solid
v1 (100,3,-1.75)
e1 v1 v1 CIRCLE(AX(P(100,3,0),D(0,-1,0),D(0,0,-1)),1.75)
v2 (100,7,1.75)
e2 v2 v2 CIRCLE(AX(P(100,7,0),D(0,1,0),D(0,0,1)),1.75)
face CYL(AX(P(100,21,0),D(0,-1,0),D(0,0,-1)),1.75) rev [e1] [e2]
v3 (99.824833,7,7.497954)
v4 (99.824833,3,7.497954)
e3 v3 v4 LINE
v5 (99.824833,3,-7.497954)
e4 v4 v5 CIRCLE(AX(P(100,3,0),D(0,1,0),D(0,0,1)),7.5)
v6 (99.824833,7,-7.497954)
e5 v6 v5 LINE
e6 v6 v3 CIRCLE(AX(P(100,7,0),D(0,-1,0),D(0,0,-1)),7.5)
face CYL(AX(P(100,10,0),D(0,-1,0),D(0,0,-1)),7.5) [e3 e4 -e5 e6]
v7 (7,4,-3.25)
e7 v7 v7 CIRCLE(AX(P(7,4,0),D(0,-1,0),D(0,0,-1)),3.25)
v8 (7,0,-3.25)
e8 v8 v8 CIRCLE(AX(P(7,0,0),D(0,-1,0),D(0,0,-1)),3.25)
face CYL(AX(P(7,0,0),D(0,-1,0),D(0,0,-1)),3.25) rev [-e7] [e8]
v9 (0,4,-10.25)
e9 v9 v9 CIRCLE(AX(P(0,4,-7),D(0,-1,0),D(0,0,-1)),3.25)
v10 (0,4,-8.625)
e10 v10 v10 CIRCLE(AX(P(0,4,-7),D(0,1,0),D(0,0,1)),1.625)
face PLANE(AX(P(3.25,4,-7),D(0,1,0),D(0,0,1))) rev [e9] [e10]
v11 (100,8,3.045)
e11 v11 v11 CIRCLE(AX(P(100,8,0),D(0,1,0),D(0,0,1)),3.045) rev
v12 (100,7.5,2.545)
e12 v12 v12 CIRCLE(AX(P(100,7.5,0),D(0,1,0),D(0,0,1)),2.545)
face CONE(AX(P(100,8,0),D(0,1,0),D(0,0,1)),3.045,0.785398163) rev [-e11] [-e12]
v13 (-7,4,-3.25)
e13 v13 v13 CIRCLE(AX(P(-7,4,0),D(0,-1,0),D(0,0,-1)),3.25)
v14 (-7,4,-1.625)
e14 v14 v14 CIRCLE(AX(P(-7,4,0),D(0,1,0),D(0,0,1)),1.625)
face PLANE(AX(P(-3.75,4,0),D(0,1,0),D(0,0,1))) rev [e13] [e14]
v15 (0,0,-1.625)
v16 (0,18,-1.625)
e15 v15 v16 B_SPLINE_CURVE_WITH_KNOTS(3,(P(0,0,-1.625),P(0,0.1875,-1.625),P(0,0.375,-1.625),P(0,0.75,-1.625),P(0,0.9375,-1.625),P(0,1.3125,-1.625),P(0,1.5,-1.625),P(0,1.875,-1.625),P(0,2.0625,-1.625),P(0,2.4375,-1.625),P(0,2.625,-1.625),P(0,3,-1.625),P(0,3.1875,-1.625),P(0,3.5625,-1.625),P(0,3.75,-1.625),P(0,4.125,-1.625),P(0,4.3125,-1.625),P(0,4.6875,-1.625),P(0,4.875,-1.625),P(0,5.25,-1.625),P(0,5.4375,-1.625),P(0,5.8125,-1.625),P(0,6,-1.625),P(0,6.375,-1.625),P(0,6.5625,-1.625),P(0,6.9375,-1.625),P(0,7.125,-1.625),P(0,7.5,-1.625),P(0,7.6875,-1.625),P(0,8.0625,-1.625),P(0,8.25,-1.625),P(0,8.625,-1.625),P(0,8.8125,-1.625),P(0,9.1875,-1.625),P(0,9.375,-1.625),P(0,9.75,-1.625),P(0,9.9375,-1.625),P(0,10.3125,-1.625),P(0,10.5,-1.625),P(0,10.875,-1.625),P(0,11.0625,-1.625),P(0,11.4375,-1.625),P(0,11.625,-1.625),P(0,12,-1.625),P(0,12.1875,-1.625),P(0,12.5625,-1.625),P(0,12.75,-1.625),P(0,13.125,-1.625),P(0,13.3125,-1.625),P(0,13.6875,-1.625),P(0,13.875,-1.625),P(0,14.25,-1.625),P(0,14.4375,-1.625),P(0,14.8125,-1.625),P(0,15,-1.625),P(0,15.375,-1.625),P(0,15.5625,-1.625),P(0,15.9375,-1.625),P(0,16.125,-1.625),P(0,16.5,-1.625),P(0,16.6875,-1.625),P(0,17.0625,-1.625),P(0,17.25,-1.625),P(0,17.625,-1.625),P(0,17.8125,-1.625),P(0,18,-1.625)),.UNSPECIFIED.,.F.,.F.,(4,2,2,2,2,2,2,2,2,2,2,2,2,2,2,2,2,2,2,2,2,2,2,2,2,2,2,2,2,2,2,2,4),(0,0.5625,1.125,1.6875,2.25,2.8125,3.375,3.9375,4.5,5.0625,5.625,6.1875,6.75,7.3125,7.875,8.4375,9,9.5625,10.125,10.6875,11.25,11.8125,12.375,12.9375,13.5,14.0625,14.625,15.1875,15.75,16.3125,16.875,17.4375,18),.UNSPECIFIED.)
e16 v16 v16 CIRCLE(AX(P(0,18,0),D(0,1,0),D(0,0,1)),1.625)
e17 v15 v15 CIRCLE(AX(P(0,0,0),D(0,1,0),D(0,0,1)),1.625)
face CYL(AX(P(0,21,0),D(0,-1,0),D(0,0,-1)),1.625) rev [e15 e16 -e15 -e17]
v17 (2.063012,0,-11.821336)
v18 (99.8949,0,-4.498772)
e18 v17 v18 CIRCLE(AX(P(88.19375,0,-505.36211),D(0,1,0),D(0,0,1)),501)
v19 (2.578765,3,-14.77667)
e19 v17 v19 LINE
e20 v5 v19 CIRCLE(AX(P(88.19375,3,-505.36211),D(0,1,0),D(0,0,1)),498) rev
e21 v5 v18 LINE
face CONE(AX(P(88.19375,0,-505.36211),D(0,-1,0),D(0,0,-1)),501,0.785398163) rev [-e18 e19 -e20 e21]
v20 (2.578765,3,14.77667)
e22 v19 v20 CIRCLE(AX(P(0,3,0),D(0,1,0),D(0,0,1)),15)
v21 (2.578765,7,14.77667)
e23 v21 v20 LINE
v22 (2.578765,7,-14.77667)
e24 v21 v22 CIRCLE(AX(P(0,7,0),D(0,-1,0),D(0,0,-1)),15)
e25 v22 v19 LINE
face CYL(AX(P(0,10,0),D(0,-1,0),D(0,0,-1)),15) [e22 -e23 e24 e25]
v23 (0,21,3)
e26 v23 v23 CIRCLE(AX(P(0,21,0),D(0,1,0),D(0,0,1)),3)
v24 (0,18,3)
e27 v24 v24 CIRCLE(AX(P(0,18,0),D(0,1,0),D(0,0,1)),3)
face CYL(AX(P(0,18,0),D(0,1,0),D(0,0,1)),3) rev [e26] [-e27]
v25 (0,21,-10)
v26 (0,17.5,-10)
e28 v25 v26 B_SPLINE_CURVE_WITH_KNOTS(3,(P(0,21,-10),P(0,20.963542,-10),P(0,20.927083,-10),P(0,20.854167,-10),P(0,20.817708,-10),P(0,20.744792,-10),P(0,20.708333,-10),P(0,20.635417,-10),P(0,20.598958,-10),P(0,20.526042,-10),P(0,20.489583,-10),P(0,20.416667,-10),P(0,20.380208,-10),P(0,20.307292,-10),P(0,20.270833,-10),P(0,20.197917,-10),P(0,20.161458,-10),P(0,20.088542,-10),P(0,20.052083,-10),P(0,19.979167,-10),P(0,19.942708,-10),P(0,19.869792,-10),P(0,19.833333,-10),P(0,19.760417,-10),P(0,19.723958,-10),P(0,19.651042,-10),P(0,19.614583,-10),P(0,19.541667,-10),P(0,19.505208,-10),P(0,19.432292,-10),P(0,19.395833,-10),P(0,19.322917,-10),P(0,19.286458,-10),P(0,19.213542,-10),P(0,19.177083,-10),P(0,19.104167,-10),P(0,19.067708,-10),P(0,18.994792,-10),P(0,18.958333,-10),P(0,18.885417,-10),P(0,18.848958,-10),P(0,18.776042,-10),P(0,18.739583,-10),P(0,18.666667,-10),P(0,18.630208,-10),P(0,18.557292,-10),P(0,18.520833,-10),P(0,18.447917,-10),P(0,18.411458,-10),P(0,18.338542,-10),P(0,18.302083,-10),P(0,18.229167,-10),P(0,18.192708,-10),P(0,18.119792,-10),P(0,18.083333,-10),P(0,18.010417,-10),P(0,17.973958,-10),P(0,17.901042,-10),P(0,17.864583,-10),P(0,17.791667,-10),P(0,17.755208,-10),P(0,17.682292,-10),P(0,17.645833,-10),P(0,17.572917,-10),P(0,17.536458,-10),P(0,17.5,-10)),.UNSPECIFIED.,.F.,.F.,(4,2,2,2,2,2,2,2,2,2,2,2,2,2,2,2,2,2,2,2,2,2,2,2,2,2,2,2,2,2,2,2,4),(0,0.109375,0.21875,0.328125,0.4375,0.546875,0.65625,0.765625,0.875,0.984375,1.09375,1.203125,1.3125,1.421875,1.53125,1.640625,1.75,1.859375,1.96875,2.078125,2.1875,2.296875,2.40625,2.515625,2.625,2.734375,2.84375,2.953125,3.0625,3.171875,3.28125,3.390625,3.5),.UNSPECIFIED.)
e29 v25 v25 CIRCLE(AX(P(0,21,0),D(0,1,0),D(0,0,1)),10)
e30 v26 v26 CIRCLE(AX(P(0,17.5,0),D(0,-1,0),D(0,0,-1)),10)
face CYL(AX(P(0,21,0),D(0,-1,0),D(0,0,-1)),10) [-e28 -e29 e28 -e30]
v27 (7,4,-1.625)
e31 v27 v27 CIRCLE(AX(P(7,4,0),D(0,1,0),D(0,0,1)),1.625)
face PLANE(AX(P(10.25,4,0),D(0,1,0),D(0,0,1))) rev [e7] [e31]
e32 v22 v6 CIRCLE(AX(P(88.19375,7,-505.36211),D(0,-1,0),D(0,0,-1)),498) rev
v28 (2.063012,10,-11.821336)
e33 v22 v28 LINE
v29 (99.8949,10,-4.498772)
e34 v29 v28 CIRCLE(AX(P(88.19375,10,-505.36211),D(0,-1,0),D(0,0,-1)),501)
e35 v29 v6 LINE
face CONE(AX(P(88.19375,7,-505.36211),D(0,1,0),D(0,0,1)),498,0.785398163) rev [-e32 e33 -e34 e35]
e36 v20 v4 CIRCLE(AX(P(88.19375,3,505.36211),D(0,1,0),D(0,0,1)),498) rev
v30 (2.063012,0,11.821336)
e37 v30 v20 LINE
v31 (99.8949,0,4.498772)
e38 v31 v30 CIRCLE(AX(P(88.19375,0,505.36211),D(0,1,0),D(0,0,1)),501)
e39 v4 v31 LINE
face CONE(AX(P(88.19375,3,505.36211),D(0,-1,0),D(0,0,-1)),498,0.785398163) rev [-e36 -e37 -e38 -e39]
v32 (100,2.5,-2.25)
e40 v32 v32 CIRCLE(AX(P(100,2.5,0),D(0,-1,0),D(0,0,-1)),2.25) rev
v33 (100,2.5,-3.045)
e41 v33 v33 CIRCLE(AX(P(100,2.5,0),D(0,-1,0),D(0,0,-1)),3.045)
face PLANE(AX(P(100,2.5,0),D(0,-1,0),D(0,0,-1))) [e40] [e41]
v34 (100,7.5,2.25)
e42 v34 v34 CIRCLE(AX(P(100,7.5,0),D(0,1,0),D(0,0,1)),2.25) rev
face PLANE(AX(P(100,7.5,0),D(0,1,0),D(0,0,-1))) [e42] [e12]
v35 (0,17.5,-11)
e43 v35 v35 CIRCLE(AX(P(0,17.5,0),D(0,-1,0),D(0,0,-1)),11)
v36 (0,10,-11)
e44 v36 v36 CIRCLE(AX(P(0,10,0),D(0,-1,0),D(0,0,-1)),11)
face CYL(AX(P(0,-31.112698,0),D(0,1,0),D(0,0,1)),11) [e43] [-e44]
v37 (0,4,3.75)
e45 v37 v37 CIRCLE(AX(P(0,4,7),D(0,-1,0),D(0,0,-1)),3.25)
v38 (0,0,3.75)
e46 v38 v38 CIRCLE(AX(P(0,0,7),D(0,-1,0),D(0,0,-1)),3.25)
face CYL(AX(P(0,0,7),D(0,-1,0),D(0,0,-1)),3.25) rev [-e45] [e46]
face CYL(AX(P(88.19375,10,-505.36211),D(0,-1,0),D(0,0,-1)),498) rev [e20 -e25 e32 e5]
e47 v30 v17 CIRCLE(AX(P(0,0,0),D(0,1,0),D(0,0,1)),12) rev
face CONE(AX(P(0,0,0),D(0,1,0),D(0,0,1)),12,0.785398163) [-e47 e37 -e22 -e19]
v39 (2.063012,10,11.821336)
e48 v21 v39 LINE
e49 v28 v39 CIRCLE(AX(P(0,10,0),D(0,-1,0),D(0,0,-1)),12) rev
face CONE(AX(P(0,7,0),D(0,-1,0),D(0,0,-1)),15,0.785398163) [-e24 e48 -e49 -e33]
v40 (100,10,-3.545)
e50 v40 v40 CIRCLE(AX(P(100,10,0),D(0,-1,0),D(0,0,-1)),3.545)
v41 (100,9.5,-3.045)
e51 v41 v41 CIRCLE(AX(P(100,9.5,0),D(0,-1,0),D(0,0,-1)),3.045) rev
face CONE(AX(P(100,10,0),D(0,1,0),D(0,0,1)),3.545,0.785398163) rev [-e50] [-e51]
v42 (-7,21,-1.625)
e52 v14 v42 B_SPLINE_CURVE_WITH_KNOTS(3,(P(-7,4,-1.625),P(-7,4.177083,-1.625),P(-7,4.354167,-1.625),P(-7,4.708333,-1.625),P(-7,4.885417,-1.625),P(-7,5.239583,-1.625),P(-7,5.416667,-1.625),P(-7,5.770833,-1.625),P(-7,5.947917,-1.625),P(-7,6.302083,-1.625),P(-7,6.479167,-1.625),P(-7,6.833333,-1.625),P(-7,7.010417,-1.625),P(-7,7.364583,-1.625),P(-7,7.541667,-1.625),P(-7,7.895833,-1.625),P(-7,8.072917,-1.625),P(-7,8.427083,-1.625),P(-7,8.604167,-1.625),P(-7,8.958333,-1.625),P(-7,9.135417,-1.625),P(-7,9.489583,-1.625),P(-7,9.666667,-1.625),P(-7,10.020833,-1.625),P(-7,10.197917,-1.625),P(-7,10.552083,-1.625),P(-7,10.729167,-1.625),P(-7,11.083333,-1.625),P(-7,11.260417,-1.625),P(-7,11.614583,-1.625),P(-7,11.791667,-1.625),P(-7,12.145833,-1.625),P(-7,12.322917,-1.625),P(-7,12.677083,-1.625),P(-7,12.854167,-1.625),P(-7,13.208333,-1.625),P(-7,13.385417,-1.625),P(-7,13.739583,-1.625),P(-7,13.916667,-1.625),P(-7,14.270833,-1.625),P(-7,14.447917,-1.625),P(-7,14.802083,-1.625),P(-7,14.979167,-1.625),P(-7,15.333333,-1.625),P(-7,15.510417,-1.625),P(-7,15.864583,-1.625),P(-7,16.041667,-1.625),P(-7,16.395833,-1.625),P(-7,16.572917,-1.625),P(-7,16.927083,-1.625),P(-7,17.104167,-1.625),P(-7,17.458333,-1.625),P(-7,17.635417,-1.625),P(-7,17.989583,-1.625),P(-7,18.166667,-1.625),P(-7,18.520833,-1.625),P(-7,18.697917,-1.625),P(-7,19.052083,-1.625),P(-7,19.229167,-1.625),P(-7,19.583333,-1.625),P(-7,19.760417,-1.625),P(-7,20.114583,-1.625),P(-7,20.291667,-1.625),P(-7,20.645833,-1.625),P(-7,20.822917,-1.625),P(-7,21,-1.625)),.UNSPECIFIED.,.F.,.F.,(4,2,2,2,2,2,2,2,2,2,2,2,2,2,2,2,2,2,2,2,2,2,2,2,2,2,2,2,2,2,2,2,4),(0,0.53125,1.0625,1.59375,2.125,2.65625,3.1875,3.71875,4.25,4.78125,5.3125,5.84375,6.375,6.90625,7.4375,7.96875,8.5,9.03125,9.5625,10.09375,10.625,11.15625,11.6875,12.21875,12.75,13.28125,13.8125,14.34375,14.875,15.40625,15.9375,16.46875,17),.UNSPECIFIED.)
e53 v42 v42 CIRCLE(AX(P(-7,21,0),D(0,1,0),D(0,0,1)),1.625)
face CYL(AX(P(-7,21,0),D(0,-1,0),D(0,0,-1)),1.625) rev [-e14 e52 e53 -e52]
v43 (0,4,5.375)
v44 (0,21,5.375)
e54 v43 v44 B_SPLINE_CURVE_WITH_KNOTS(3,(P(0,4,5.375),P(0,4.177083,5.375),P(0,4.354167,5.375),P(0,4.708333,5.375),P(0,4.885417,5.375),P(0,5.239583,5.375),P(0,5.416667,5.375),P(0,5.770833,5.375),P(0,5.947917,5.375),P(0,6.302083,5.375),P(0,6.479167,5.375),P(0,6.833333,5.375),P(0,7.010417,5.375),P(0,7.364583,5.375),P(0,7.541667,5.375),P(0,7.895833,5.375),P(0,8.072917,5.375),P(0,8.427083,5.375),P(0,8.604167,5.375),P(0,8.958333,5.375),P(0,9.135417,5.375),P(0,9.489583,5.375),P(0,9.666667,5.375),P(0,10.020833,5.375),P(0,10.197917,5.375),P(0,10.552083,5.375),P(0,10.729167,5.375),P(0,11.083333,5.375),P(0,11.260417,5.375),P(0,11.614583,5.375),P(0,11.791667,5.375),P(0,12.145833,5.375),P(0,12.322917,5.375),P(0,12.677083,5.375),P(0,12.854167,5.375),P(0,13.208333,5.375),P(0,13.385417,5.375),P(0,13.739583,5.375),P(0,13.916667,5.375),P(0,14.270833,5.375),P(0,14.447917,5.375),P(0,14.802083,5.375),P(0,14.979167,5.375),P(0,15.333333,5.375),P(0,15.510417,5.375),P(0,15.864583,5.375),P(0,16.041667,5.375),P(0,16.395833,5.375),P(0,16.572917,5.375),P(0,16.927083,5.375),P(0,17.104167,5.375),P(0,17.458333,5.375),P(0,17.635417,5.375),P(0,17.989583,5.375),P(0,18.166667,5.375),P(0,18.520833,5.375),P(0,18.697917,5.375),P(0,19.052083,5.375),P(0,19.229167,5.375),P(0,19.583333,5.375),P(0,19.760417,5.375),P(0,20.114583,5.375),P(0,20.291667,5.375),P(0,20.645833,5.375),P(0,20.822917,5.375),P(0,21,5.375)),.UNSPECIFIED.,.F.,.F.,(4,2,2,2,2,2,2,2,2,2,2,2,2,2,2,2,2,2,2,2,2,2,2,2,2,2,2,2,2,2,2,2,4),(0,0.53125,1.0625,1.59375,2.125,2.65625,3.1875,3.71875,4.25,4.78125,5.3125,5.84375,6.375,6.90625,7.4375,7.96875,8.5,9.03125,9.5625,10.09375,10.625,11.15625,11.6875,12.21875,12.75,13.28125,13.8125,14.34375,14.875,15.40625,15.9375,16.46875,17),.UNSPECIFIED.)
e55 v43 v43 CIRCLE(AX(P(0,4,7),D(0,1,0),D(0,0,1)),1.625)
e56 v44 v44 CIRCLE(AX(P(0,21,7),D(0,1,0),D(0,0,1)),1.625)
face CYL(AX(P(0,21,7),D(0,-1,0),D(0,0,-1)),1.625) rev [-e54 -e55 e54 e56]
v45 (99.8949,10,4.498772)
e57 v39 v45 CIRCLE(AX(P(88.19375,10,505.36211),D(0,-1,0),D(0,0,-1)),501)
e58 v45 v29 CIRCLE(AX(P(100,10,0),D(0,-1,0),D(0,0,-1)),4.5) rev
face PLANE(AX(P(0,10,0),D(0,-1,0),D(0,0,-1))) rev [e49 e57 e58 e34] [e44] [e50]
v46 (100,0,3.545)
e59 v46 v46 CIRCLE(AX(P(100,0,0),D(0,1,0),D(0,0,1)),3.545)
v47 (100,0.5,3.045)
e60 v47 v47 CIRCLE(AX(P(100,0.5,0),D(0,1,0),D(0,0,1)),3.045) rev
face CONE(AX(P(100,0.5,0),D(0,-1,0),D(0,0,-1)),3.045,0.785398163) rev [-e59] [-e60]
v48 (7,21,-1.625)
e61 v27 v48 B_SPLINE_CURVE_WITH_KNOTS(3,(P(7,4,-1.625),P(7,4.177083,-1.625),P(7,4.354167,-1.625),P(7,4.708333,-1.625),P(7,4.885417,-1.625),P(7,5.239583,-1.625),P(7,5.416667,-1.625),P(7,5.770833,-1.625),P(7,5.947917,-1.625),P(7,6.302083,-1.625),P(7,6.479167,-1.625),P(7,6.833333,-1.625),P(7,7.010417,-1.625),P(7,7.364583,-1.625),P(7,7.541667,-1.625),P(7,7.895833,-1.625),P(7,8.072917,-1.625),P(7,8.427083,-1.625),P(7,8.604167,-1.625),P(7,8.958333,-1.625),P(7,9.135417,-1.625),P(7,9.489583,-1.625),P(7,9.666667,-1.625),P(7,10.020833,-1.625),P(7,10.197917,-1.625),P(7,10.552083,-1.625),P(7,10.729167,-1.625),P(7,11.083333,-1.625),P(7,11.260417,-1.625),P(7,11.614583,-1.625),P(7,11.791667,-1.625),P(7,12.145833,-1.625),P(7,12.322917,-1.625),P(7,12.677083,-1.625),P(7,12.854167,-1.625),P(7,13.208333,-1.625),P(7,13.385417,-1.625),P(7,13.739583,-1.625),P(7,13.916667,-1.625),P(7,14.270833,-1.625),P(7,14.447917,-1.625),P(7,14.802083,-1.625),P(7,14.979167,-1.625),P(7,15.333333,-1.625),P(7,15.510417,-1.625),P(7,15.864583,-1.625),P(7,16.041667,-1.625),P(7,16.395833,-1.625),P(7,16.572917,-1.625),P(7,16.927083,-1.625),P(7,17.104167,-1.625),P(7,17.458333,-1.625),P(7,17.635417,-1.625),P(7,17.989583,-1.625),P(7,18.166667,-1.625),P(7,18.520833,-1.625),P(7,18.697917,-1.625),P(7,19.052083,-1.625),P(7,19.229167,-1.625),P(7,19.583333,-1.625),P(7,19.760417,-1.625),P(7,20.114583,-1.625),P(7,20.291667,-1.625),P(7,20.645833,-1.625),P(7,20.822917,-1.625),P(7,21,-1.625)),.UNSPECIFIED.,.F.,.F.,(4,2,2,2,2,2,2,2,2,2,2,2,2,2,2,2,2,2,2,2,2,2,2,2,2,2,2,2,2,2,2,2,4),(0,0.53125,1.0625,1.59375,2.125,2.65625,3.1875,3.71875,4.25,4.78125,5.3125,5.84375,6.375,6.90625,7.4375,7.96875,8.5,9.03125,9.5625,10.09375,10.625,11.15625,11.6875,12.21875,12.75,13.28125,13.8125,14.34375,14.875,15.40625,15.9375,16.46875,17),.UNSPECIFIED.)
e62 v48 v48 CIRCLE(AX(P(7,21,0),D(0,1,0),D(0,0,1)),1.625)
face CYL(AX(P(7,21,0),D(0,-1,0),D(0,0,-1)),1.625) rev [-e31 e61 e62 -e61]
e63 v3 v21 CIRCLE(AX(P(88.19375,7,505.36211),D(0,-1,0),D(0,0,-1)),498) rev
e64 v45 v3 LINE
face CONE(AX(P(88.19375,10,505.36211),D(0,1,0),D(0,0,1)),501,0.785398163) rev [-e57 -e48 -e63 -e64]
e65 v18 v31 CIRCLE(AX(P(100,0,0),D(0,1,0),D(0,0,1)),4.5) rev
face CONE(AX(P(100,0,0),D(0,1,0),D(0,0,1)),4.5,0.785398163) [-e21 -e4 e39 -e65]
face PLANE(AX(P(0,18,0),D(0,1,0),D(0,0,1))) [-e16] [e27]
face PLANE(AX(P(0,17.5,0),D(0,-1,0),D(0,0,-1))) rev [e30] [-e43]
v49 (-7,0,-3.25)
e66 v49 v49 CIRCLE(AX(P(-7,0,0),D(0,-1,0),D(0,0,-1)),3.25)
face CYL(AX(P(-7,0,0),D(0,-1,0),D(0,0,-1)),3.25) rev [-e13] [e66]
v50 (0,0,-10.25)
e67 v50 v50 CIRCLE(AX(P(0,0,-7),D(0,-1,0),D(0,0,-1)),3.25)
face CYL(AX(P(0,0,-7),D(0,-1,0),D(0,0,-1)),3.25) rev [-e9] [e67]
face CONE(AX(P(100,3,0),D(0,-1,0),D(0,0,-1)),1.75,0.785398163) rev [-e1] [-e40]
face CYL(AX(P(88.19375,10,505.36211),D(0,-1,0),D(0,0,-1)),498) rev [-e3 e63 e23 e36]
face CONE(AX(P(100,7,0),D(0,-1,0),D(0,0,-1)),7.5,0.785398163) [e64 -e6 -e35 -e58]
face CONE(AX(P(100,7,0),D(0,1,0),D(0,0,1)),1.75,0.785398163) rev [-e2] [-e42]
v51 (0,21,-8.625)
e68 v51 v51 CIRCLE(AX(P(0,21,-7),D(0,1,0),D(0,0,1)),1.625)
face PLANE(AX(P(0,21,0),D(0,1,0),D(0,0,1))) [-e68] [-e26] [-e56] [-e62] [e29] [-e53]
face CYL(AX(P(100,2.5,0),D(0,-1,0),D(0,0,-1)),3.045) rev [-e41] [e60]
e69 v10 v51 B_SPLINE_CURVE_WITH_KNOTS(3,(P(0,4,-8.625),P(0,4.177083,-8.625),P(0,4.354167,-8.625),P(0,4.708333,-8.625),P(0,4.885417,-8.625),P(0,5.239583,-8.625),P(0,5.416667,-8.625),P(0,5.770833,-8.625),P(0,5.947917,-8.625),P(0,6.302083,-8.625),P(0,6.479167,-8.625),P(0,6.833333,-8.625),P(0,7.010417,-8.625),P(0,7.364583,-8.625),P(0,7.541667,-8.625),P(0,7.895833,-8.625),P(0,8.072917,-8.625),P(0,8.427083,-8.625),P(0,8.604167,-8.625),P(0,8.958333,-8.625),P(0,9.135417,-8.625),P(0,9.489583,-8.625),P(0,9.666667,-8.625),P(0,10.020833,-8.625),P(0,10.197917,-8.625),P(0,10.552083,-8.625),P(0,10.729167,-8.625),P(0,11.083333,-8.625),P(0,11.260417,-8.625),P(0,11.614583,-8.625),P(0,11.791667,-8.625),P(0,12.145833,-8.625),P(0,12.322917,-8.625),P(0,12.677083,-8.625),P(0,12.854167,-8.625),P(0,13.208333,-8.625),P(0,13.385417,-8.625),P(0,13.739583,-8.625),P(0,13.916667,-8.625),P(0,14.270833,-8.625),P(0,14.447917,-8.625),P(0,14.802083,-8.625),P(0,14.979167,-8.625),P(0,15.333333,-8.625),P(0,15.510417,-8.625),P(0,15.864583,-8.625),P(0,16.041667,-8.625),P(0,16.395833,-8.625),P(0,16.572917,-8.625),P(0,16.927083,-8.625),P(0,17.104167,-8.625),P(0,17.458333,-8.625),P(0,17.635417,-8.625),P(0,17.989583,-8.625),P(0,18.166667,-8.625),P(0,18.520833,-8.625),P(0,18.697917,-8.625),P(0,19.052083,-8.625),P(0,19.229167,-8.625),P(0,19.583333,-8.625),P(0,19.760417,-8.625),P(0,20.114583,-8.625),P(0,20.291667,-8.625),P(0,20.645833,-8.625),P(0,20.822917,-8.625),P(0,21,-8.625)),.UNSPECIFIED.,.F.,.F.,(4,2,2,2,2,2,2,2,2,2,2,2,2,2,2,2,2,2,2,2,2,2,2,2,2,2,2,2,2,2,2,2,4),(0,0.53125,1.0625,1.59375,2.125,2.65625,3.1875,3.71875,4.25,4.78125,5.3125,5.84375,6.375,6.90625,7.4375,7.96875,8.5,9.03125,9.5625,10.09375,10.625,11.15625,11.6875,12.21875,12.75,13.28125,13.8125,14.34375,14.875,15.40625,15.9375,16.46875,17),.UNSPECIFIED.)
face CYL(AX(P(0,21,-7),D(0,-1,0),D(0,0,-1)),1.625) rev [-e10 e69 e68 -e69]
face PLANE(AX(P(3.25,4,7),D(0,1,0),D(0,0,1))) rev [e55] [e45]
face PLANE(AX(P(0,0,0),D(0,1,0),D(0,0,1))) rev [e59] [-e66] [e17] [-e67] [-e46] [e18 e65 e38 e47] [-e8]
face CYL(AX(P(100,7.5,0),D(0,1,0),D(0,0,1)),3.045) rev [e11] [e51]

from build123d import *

# Parameters (mm, degrees)
ESQUISSE1_R                = 10
ESQUISSE1_R_2              = 1.625
BOSS_EXTRU_1_DEPTH         = 21
ESQUISSE2_R                = 3
ENL_V_MAT_EXTRU_1_DEPTH    = 3
BOSS_EXTRU_2_START         = 21
ESQUISSE3_R                = 11
ESQUISSE3_R_2              = 10
BOSS_EXTRU_2_DEPTH         = 17.5
ESQUISSE4_R                = 11
BOSS_EXTRU_3_DEPTH         = 10
ESQUISSE5_R                = 3.045
ENL_V_MAT_EXTRU_2_DEPTH    = 2.5
ESQUISSE6_R                = 1.75
ENL_V_MAT_EXTRU_3_DEPTH    = 111.106766368
CHANFREIN1_SIZE            = 3
PER_AGEAVANC_2_OUTLINE_R   = 3.25
PER_AGEAVANC_2_OUTLINE_R_2 = 1.625
PER_AGEAVANC_2_DEPTH       = 4
CHANFREIN2_SIZE            = 0.5


# Read off the part's stored shape, not the designer's step: PerçageAvancé2
with BuildPart() as part:
    # Esquisse1 → Boss.-Extru.1 (new body)
    with BuildSketch(Plane(origin=(0, 0, 0), x_dir=(1, 0, 0), z_dir=(0, 1, 0))):
        with Locations(Location((0, 0, 0), (0, 0, 90))):
            Circle(ESQUISSE1_R)
        with Locations(Location((0, 7, 0), (0, 0, 90))):
            Circle(ESQUISSE1_R_2, mode=Mode.SUBTRACT)
        with Locations(Location((7, 0, 0), (0, 0, 90))):
            Circle(ESQUISSE1_R_2, mode=Mode.SUBTRACT)
        with Locations(Location((0, -7, 0), (0, 0, 90))):
            Circle(ESQUISSE1_R_2, mode=Mode.SUBTRACT)
        with Locations(Location((-7, 0, 0), (0, 0, 90))):
            Circle(ESQUISSE1_R_2, mode=Mode.SUBTRACT)
        with Locations(Location((0, 0, 0), (0, 0, 90))):
            Circle(ESQUISSE1_R_2, mode=Mode.SUBTRACT)
    extrude(amount=BOSS_EXTRU_1_DEPTH)

    # Esquisse2 → Enlèv. mat.-Extru.1 (cut)
    with BuildSketch(Plane(origin=(0, 21, 0), x_dir=(1, 0, 0), z_dir=(0, 1, 0))):
        with Locations(Location((0, 0, 0), (0, 0, 270))):
            Circle(ESQUISSE2_R)
    extrude(amount=-ENL_V_MAT_EXTRU_1_DEPTH, mode=Mode.SUBTRACT)

    # Esquisse3 → Boss.-Extru.2 (add)
    with BuildSketch(Plane.XZ.offset(-21).offset(BOSS_EXTRU_2_START)):
        with Locations(Location((0, 0, 0), (0, 0, 90))):
            Circle(ESQUISSE3_R)
        with Locations(Location((0, 0, 0), (0, 0, 270))):
            Circle(ESQUISSE3_R_2, mode=Mode.SUBTRACT)
    extrude(amount=-BOSS_EXTRU_2_DEPTH)

    # Esquisse4 → Boss.-Extru.3 (add)
    with BuildSketch(Plane.XZ):
        with BuildLine():
            ThreePointArc((2.57876462, 14.77666989), (-15, 0), (2.57876462, -14.77666989))
            ThreePointArc((2.57876462, -14.77666989), (51.023205541, -8.75124585), (99.824833086, -7.497954158))
            ThreePointArc((99.824833086, -7.497954158), (107.5, 0), (99.824833086, 7.497954158))
            ThreePointArc((99.824833086, 7.497954158), (51.023205541, 8.75124585), (2.57876462, 14.77666989))
        make_face()
        with Locations(Location((0, 0, 0), (0, 0, 270))):
            Circle(ESQUISSE4_R, mode=Mode.SUBTRACT)
    extrude(amount=-BOSS_EXTRU_3_DEPTH)

    # Esquisse5 → Enlèv. mat.-Extru.2 (cut)
    with BuildSketch(Plane.XZ):
        with Locations(Location((100, 0, 0), (0, 0, 270))):
            Circle(ESQUISSE5_R)
    enl_v_mat_extru_2 = extrude(amount=-ENL_V_MAT_EXTRU_2_DEPTH, mode=Mode.SUBTRACT)

    # Symétrie1: Enlèv. mat.-Extru.2 across plane
    add(enl_v_mat_extru_2.mirror(Plane(origin=(0, 5, 0), x_dir=(0, 0, 1), z_dir=(0, -1, 0))), mode=Mode.SUBTRACT)

    # Esquisse6 → Enlèv. mat.-Extru.3 (cut, through all)
    with BuildSketch(Plane.XZ.offset(-2.5)):
        with Locations(Location((100, 0, 0), (0, 0, 270))):
            Circle(ESQUISSE6_R)
    extrude(amount=-ENL_V_MAT_EXTRU_3_DEPTH, mode=Mode.SUBTRACT)

    # Chanfrein1
    chanfrein1_edges = [part.edges().sort_by_distance(p)[0] for p in [
        (107.5, 10, 0),
        (51.023205541, 10, -8.75124585),
        (-15, 10, 0),
        (51.023205541, 0, 8.75124585),
        (51.023205541, 10, 8.75124585),
        (107.5, 0, 0),
        (-15, 0, 0),
        (51.023205541, 0, -8.75124585),
    ]]
    chamfer(chanfrein1_edges, length=CHANFREIN1_SIZE)

    # PerçageAvancé2 outline → PerçageAvancé2 (cut)
    # profile 1 of 4: a face of its own
    with BuildSketch(Plane(origin=(0, 0, 0), x_dir=(1, 0, 0), z_dir=(0, 1, 0))):
        with Locations((-7, 0)):
            Circle(PER_AGEAVANC_2_OUTLINE_R)
        with Locations((-7, 0)):
            Circle(PER_AGEAVANC_2_OUTLINE_R_2, mode=Mode.SUBTRACT)
    # profile 2 of 4: a face of its own
    with BuildSketch(Plane(origin=(0, 0, 0), x_dir=(1, 0, 0), z_dir=(0, 1, 0))):
        with Locations((0, 7)):
            Circle(PER_AGEAVANC_2_OUTLINE_R)
        with Locations((0, 7)):
            Circle(PER_AGEAVANC_2_OUTLINE_R_2, mode=Mode.SUBTRACT)
    # profile 3 of 4: a face of its own
    with BuildSketch(Plane(origin=(0, 0, 0), x_dir=(1, 0, 0), z_dir=(0, 1, 0))):
        with Locations((0, -7)):
            Circle(PER_AGEAVANC_2_OUTLINE_R)
        with Locations((0, -7)):
            Circle(PER_AGEAVANC_2_OUTLINE_R_2, mode=Mode.SUBTRACT)
    # profile 4 of 4: a face of its own
    with BuildSketch(Plane(origin=(0, 0, 0), x_dir=(1, 0, 0), z_dir=(0, 1, 0))):
        with Locations((7, 0)):
            Circle(PER_AGEAVANC_2_OUTLINE_R)
        with Locations((7, 0)):
            Circle(PER_AGEAVANC_2_OUTLINE_R_2, mode=Mode.SUBTRACT)
    extrude(amount=PER_AGEAVANC_2_DEPTH, mode=Mode.SUBTRACT)

    # Chanfrein2
    chanfrein2_edges = [part.edges().sort_by_distance(p)[0] for p in [
        (100, 0, 3.045),
        (100, 10, 3.045),
        (100, 7.5, 3.045),
        (100, 7.5, 1.75),
        (100, 2.5, 1.75),
    ]]
    chamfer(chanfrein2_edges, length=CHANFREIN2_SIZE)


solid = part.part
